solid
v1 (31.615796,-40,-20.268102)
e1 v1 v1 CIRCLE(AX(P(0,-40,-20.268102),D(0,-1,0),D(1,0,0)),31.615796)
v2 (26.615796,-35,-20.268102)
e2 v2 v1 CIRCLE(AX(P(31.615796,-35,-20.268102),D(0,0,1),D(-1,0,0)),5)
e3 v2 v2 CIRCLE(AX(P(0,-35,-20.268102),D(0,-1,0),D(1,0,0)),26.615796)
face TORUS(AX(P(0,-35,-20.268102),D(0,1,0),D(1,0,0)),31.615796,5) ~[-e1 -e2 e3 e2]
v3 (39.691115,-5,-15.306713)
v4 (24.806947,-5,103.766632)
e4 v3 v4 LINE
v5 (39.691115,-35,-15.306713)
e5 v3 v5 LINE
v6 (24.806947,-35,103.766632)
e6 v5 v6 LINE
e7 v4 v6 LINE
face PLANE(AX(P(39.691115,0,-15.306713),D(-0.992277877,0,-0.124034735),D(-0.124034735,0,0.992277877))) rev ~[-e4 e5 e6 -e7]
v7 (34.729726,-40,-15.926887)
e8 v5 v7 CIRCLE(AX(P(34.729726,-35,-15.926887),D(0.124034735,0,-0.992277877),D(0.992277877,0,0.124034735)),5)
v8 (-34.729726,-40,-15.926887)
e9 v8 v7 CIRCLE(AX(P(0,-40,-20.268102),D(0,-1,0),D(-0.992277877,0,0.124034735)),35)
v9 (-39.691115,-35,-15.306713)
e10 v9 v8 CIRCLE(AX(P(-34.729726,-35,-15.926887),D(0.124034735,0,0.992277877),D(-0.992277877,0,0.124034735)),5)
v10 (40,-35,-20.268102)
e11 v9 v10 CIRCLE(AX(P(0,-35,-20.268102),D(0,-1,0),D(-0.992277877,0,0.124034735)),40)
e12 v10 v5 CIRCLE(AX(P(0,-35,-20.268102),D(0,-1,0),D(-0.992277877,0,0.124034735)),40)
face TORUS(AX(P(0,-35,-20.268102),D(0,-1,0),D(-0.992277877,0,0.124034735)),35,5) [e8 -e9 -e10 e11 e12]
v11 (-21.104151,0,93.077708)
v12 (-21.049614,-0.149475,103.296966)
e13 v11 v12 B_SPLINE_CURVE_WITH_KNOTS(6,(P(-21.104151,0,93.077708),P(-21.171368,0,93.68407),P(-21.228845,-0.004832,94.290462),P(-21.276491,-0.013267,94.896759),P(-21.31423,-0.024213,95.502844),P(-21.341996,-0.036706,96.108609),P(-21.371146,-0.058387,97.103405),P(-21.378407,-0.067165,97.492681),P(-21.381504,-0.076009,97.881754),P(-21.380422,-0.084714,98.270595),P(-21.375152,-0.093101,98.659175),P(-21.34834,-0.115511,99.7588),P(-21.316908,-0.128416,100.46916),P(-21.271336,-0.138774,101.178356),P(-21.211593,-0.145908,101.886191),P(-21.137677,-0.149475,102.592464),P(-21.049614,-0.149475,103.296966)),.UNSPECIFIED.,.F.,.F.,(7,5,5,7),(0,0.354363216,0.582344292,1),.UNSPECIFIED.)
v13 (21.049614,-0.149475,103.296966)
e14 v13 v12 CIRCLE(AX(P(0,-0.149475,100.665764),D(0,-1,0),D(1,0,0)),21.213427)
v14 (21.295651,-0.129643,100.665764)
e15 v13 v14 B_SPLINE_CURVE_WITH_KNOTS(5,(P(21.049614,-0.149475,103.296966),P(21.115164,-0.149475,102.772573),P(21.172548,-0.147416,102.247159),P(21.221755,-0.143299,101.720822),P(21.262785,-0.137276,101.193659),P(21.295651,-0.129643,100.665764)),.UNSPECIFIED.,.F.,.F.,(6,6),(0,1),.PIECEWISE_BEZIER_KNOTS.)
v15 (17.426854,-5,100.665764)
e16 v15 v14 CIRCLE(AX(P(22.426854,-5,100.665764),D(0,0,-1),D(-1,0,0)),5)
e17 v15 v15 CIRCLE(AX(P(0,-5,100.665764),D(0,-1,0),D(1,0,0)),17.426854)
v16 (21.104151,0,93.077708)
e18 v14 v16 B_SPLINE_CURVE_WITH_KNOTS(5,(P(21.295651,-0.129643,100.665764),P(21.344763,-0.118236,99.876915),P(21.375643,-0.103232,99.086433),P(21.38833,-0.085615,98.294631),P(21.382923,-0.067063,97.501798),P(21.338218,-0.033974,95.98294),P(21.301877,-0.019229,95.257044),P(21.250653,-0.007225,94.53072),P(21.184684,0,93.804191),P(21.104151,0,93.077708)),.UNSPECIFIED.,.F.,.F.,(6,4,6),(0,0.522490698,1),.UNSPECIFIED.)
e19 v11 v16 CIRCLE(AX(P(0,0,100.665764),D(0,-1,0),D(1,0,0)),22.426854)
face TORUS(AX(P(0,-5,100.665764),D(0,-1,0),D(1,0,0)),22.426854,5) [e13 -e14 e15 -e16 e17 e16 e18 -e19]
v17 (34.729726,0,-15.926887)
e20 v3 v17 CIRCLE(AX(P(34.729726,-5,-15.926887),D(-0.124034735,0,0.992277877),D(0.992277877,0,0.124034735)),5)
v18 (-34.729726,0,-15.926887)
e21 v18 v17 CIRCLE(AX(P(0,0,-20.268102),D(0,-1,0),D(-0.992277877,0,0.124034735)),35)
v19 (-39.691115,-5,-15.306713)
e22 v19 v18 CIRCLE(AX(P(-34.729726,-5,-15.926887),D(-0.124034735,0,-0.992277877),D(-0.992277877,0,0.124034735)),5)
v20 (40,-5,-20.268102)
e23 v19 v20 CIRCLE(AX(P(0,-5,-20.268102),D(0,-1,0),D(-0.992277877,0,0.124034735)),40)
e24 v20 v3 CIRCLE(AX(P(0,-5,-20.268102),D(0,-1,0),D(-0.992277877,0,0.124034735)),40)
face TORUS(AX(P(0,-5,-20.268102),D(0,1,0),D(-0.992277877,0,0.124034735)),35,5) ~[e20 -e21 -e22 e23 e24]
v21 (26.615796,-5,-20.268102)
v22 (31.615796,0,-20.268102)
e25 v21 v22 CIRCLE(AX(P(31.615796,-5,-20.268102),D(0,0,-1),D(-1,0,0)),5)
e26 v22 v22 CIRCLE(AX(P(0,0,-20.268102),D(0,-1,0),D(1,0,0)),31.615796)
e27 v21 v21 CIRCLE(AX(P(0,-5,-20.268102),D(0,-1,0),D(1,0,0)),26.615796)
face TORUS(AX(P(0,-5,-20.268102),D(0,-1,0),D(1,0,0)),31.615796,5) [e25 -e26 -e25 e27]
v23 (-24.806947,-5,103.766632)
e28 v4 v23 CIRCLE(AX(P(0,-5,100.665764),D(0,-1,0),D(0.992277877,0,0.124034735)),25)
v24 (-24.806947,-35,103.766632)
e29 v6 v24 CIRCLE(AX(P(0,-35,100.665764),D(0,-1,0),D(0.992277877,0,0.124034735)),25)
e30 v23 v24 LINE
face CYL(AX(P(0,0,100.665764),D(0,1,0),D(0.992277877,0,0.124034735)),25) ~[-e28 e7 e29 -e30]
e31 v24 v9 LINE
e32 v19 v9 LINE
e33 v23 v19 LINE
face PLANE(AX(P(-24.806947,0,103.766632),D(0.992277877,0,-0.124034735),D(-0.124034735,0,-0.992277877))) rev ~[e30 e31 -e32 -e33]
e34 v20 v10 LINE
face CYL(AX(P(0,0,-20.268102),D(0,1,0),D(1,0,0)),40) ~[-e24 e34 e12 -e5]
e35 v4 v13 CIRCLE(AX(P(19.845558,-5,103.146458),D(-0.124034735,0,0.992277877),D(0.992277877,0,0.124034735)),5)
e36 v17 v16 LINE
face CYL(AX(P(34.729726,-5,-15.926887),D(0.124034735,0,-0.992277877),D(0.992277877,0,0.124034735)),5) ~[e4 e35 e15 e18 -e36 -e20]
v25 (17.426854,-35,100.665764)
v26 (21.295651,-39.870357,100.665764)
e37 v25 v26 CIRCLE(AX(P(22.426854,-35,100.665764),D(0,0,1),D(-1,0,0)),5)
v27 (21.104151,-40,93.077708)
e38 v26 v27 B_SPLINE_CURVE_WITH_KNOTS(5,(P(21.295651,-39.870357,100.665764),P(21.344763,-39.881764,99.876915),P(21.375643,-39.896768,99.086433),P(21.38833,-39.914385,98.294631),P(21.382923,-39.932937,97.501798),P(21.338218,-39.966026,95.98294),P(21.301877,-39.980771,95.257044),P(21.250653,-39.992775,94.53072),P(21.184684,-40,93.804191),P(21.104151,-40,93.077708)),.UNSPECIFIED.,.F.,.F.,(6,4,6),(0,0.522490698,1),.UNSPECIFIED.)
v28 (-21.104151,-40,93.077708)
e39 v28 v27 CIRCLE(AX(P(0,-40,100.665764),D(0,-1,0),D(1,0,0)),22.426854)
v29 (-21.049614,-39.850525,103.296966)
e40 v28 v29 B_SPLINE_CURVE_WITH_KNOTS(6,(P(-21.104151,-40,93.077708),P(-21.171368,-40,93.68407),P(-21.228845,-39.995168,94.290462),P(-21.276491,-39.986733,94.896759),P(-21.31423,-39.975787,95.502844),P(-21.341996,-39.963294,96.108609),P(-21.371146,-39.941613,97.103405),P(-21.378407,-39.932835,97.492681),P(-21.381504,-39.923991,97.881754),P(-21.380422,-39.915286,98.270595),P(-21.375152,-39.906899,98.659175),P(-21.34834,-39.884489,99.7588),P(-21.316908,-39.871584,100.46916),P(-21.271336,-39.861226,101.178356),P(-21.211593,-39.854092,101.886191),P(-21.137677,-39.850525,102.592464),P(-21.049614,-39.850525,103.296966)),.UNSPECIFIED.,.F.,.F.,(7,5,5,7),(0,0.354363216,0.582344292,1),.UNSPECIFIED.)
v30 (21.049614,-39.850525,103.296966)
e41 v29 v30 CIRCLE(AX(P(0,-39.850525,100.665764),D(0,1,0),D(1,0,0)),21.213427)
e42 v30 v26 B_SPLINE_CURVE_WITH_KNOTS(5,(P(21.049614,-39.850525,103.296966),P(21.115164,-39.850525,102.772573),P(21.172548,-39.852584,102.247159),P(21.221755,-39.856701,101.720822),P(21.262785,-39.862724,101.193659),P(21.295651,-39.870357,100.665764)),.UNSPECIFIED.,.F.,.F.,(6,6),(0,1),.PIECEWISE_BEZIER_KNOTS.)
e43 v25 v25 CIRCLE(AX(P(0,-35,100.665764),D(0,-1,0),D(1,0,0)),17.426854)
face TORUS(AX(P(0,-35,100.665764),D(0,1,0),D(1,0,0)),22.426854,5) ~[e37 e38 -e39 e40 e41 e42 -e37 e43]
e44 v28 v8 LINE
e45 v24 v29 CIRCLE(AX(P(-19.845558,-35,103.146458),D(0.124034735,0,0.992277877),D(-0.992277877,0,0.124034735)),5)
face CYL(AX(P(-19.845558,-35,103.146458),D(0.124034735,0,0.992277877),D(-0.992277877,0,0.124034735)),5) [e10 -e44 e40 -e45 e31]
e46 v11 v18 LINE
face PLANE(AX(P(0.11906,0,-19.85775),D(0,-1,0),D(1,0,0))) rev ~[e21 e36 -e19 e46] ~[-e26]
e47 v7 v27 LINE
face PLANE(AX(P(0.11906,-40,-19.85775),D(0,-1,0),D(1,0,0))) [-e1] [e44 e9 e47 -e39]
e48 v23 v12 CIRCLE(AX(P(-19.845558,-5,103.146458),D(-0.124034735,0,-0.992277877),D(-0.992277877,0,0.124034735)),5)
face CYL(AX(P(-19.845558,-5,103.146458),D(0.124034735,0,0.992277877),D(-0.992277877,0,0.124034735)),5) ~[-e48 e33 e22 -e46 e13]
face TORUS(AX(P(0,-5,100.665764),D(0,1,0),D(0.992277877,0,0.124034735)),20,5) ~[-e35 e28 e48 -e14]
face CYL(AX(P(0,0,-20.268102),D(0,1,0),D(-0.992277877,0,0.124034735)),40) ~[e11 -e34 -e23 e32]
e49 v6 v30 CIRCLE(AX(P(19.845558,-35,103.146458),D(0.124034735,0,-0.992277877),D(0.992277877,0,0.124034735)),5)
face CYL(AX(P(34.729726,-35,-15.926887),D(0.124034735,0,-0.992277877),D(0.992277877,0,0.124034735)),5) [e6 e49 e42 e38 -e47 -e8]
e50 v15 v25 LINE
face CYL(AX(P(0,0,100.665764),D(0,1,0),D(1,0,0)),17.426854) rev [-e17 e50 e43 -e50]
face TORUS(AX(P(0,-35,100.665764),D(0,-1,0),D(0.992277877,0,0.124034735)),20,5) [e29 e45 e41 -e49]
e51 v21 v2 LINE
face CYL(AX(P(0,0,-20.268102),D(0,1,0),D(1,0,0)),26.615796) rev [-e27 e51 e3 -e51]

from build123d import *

# Parameters (mm, degrees)
F0_R         = 26.615795876
F0_R_2       = 17.4268543136
F1_DEPTH     = 40
F2_T1_DEPTH  = 120
F2_T3_DEPTH  = 120
F2_T14_ANGLE = 165.7499673022
F2_T16_ANGLE = 165.7499673022
F2_T18_ANGLE = 194.2500326978
F2_T20_ANGLE = 194.2500326978


# Not quite as in the source:
# - a fillet or chamfer that OpenCascade refuses, or shapes differently, is made with other operations: its cross-section is extruded or revolved along the edge and cut away or added


with BuildPart() as f1:
    # F0 (on Front) → F1 (new body)
    with BuildSketch(Plane.XZ):
        with BuildLine():
            ThreePointArc((-39.6911150685, -15.3067131157), (-2.4854976623, -60.1908065831), (40, -20.2681024992))
            ThreePointArc((40, -20.2681024992), (39.9227040839, -17.782604837), (39.6911150685, -15.3067131157))
            ThreePointArc((39.6911150685, -15.3067131157), (0, 19.7318975008), (-39.6911150685, -15.3067131157))
        make_face()
        with Locations((0, -20.2681024992)):
            Circle(F0_R, mode=Mode.SUBTRACT)
        with BuildLine():
            ThreePointArc((-39.6911150685, -15.3067131157), (0, 19.7318975008), (39.6911150685, -15.3067131157))
            Line((39.6911150685, -15.3067131157), (24.8069469178, 103.76663209))
            ThreePointArc((24.8069469178, 103.76663209), (24.9516900524, 102.2191997641), (25, 100.6657637252))
            ThreePointArc((25, 100.6657637252), (-1.5534360389, 75.7140736728), (-24.8069469178, 103.76663209))
            Line((-24.8069469178, 103.76663209), (-39.6911150685, -15.3067131157))
        make_face()
        with BuildLine():
            ThreePointArc((25, 100.6657637252), (24.9516900524, 102.2191997641), (24.8069469178, 103.76663209))
            ThreePointArc((24.8069469178, 103.76663209), (0, 125.6657637252), (-24.8069469178, 103.76663209))
            ThreePointArc((-24.8069469178, 103.76663209), (-1.5534360389, 75.7140736728), (25, 100.6657637252))
        make_face()
        with Locations((0, 100.6657637252)):
            Circle(F0_R_2, mode=Mode.SUBTRACT)
    extrude(amount=F1_DEPTH)

    # F2: fillet of radius 5 on 8 edges, made by hand

    # F2_s2 → F2_t1 (cut)
    with BuildSketch(Plane(origin=(2.4945356922, 0, -19.9562855377), x_dir=(0, 1, 0), z_dir=(-0.1240347346, 0, 0.9922778767))):
        with BuildLine():
            ThreePointArc((-5, -37.4860512859), (-1.4644660941, -36.0215851918), (0, -32.4860512859))
            Line((0, -32.4860512859), (0, -37.4860512859))
            Line((0, -37.4860512859), (-5, -37.4860512859))
        make_face()
        with BuildLine():
            ThreePointArc((-35, -37.4860512859), (-38.5355339059, -36.0215851918), (-40, -32.4860512859))
            Line((-40, -32.4860512859), (-40, -37.4860512859))
            Line((-40, -37.4860512859), (-35, -37.4860512859))
        make_face()
    extrude(amount=F2_T1_DEPTH, mode=Mode.SUBTRACT)

    # F2_s4 → F2_t3 (cut)
    with BuildSketch(Plane(origin=(12.3896324585, 0, 99.1170596679), x_dir=(0, 1, 0), z_dir=(-0.1240347346, 0, -0.9922778767))):
        with BuildLine():
            ThreePointArc((-35, -37.4860512859), (-38.5355339059, -36.0215851918), (-40, -32.4860512859))
            Line((-40, -32.4860512859), (-40, -37.4860512859))
            Line((-40, -37.4860512859), (-35, -37.4860512859))
        make_face()
        with BuildLine():
            ThreePointArc((-5, -37.4860512859), (-1.4644660941, -36.0215851918), (0, -32.4860512859))
            Line((0, -32.4860512859), (0, -37.4860512859))
            Line((0, -37.4860512859), (-5, -37.4860512859))
        make_face()
    extrude(amount=F2_T3_DEPTH, mode=Mode.SUBTRACT)

    # F2_s5 → F2_t6 (revolve, cut)
    with BuildSketch(Plane.XY.offset(100.6657637252)):
        with BuildLine():
            ThreePointArc((17.4268543136, -35), (18.8913204077, -38.5355339059), (22.4268543136, -40))
            Line((22.4268543136, -40), (17.4268543136, -40))
            Line((17.4268543136, -40), (17.4268543136, -35))
        make_face()
    revolve(axis=Axis((0, -40, 100.6657637252), (0, -1, 0)), mode=Mode.SUBTRACT)

    # F2_s7 → F2_t8 (revolve, cut)
    with BuildSketch(Plane.XY.offset(-20.2681024992)):
        with BuildLine():
            ThreePointArc((26.615795876, -35), (28.0802619701, -38.5355339059), (31.615795876, -40))
            Line((31.615795876, -40), (26.615795876, -40))
            Line((26.615795876, -40), (26.615795876, -35))
        make_face()
    revolve(axis=Axis((0, -40, -20.2681024992), (0, -1, 0)), mode=Mode.SUBTRACT)

    # F2_s9 → F2_t10 (revolve, cut)
    with BuildSketch(Plane.XY.offset(-20.2681024992)):
        with BuildLine():
            ThreePointArc((26.615795876, -5), (28.0802619701, -1.4644660941), (31.615795876, 0))
            Line((31.615795876, 0), (26.615795876, 0))
            Line((26.615795876, 0), (26.615795876, -5))
        make_face()
    revolve(axis=Axis((0, 0, -20.2681024992), (0, -1, 0)), mode=Mode.SUBTRACT)

    # F2_s11 → F2_t12 (revolve, cut)
    with BuildSketch(Plane.XY.offset(100.6657637252)):
        with BuildLine():
            ThreePointArc((17.4268543136, -5), (18.8913204077, -1.4644660941), (22.4268543136, 0))
            Line((22.4268543136, 0), (17.4268543136, 0))
            Line((17.4268543136, 0), (17.4268543136, -5))
        make_face()
    revolve(axis=Axis((0, 0, 100.6657637252), (0, -1, 0)), mode=Mode.SUBTRACT)

    # F2_s13 → F2_t14 (revolve, cut)
    with BuildSketch(Plane(origin=(-12.3896324585, 0, 99.1170596679), x_dir=(0, 1, 0), z_dir=(0.1240347346, 0, -0.9922778767))):
        with BuildLine():
            ThreePointArc((-5, 37.4860512859), (-1.4644660941, 36.0215851918), (0, 32.4860512859))
            Line((0, 32.4860512859), (0, 37.4860512859))
            Line((0, 37.4860512859), (-5, 37.4860512859))
        make_face()
    revolve(axis=Axis((0, 0, 100.6657637252), (0, -1, 0)), revolution_arc=F2_T14_ANGLE, mode=Mode.SUBTRACT)

    # F2_s15 → F2_t16 (revolve, cut)
    with BuildSketch(Plane(origin=(-12.3896324585, 0, 99.1170596679), x_dir=(0, 1, 0), z_dir=(0.1240347346, 0, -0.9922778767))):
        with BuildLine():
            ThreePointArc((-35, 37.4860512859), (-38.5355339059, 36.0215851918), (-40, 32.4860512859))
            Line((-40, 32.4860512859), (-40, 37.4860512859))
            Line((-40, 37.4860512859), (-35, 37.4860512859))
        make_face()
    revolve(axis=Axis((0, -40, 100.6657637252), (0, -1, 0)), revolution_arc=F2_T16_ANGLE, mode=Mode.SUBTRACT)

    # F2_s17 → F2_t18 (revolve, cut)
    with BuildSketch(Plane(origin=(-2.4945356922, 0, -19.9562855377), x_dir=(0, 1, 0), z_dir=(0.1240347346, 0, 0.9922778767))):
        with BuildLine():
            ThreePointArc((-35, 37.4860512859), (-38.5355339059, 36.0215851918), (-40, 32.4860512859))
            Line((-40, 32.4860512859), (-40, 37.4860512859))
            Line((-40, 37.4860512859), (-35, 37.4860512859))
        make_face()
    revolve(axis=Axis((0, -40, -20.2681024992), (0, -1, 0)), revolution_arc=F2_T18_ANGLE, mode=Mode.SUBTRACT)

    # F2_s19 → F2_t20 (revolve, cut)
    with BuildSketch(Plane(origin=(-2.4945356922, 0, -19.9562855377), x_dir=(0, 1, 0), z_dir=(0.1240347346, 0, 0.9922778767))):
        with BuildLine():
            ThreePointArc((-5, 37.4860512859), (-1.4644660941, 36.0215851918), (0, 32.4860512859))
            Line((0, 32.4860512859), (0, 37.4860512859))
            Line((0, 37.4860512859), (-5, 37.4860512859))
        make_face()
    revolve(axis=Axis((0, 0, -20.2681024992), (0, -1, 0)), revolution_arc=F2_T20_ANGLE, mode=Mode.SUBTRACT)


solid = f1.part
